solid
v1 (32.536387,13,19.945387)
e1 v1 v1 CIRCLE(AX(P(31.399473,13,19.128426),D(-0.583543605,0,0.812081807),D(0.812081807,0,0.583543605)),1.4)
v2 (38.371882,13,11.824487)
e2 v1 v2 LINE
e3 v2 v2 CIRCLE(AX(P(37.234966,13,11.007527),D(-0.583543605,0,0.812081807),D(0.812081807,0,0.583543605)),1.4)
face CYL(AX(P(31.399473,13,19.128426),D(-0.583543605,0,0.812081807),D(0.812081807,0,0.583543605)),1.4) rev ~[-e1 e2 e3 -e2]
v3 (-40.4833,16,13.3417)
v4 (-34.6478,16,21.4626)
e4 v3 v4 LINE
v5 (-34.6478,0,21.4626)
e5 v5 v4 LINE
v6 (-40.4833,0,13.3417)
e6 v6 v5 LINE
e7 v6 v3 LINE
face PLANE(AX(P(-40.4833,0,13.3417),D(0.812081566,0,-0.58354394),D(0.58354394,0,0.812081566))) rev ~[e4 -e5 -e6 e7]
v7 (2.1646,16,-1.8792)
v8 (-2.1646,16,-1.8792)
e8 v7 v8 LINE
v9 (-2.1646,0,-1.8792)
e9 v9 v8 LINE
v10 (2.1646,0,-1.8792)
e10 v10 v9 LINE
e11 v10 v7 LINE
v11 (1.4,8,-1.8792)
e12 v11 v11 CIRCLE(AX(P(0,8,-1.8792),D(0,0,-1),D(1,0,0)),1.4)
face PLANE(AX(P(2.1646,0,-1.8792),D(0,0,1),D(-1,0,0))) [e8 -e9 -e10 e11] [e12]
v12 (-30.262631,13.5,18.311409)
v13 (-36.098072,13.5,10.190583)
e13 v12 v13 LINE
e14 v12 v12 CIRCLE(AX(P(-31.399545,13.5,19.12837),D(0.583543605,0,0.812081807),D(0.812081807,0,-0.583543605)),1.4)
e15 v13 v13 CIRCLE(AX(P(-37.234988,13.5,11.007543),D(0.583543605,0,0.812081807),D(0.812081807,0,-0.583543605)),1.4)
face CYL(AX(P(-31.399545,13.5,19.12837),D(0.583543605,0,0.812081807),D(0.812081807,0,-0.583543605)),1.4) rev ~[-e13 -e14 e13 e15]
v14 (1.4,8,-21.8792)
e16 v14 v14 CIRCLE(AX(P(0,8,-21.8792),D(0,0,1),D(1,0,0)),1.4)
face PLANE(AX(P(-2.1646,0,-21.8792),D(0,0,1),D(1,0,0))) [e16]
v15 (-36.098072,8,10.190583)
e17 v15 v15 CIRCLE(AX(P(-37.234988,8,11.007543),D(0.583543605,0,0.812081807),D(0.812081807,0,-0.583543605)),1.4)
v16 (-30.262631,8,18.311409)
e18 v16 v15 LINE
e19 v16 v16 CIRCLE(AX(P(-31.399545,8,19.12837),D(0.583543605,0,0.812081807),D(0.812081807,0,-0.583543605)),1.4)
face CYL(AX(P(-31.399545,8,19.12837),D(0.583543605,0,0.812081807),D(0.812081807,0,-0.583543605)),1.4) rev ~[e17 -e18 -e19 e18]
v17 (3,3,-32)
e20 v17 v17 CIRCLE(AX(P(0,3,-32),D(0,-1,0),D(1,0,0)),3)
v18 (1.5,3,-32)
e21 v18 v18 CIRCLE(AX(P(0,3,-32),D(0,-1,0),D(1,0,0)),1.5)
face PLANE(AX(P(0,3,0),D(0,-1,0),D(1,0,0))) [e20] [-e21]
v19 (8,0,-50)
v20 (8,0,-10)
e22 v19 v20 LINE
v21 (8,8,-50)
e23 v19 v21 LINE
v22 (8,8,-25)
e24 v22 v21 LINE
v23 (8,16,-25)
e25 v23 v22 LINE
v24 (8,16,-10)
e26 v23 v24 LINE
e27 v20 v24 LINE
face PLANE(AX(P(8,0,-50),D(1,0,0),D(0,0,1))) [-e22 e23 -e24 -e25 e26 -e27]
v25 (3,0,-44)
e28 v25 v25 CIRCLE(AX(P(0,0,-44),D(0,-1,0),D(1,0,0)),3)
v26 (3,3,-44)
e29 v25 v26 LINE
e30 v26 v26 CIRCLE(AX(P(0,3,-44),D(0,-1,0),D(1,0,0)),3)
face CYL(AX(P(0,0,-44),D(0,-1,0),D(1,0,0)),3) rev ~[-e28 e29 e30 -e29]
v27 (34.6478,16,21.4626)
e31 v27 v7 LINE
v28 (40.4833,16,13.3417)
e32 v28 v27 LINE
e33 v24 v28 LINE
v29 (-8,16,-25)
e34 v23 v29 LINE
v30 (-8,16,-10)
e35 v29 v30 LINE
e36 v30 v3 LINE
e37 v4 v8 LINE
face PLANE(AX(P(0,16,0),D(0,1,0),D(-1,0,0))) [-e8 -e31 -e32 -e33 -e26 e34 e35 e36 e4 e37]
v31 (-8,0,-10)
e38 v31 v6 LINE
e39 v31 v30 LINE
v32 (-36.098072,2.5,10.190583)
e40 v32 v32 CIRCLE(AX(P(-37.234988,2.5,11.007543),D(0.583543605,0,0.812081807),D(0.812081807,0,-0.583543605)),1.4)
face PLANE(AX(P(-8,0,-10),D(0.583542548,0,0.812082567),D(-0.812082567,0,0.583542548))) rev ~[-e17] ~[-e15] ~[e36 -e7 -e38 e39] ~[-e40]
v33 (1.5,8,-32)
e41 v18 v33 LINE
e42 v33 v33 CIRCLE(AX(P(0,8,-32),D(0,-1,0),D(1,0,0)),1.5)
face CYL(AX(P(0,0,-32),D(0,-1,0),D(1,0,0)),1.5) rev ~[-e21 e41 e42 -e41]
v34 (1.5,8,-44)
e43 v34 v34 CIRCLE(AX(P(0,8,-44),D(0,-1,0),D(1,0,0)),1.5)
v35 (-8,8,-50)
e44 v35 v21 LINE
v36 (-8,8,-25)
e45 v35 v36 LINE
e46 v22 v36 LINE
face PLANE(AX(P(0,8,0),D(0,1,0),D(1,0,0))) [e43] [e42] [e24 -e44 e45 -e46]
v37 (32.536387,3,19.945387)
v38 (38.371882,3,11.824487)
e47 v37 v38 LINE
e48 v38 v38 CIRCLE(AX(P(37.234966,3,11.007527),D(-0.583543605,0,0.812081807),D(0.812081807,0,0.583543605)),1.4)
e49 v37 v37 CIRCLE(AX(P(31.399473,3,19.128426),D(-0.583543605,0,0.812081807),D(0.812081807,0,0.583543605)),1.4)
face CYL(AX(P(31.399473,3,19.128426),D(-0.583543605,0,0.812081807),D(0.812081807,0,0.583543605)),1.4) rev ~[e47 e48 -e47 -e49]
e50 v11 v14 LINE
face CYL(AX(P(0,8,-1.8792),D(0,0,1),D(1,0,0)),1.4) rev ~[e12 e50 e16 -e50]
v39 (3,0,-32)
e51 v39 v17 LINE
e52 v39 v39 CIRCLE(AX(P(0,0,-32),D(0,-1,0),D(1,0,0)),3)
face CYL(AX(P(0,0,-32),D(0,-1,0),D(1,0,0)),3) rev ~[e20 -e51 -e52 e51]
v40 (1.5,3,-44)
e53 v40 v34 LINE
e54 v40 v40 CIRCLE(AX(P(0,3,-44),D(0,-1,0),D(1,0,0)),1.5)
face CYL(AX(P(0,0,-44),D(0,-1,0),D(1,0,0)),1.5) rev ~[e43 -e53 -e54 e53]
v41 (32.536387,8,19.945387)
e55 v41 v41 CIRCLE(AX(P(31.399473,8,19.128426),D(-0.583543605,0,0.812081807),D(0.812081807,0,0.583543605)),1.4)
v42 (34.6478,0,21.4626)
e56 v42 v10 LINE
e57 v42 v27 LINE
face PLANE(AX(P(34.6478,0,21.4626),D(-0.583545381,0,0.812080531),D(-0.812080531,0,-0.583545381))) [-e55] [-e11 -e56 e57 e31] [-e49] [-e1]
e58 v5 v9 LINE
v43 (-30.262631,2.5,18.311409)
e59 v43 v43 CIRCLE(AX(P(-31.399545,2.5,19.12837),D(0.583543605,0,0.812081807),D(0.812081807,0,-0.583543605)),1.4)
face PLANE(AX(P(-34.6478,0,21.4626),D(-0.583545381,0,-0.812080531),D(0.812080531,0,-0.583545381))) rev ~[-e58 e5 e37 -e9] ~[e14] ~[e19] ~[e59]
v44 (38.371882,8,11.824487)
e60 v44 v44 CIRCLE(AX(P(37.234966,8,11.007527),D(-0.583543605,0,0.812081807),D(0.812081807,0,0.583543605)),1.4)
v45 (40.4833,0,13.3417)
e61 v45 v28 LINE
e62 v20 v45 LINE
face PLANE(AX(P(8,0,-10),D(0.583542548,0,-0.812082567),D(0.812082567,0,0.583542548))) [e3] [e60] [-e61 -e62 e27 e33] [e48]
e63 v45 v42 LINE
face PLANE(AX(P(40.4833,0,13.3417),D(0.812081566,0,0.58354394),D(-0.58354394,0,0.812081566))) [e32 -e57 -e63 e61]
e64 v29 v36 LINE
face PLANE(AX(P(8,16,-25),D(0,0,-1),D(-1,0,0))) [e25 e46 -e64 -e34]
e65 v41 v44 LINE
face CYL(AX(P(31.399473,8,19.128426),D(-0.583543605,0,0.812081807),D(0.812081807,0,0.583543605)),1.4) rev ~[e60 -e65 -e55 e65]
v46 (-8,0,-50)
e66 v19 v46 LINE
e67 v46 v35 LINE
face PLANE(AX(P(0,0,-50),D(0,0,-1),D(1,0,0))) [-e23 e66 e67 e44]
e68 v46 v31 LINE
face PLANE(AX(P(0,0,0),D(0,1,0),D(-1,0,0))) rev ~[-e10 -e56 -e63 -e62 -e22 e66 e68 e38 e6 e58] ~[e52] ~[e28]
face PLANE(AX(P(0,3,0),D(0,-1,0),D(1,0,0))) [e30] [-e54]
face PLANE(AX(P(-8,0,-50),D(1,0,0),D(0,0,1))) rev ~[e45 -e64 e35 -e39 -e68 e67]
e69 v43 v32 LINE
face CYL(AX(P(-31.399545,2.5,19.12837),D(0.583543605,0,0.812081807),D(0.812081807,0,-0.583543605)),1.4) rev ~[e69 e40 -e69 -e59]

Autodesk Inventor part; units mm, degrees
ref_plane "YZ Plane" through (0, 0, 0) normal (1, 0, 0) x (0, 1, 0)
ref_plane "XZ Plane" through (0, 0, 0) normal (0, 1, 0) x (-1, 0, 0)
ref_plane "XY Plane" through (0, 0, 0) normal (0, 0, 1) x (1, 0, 0)
sketch "Sketch1" plane through (0, 0, 0) normal (0, 1, 0) x (-1, 0, 0)
  line L0 (0, -50) -> (8, -50)
  line L1 (8, -50) -> (8, -10)
  line L2 (0, 0) -> (0, -50) construction
  line L3 (0, -50) -> (-8, -50)
  line L4 (-8, -50) -> (-8, -10)
  line L5 (8, -10) -> (40.4833, 13.3417)
  line L6 (40.4833, 13.3417) -> (34.6478, 21.4626)
  line L7 (34.6478, 21.4626) -> (2.1646, -1.8792)
  line L8 (2.1646, -1.8792) -> (0, -1.8792)
  line L9 (-8, -10) -> (-40.4833, 13.3417)
  line L10 (-40.4833, 13.3417) -> (-34.6478, 21.4626)
  line L11 (-34.6478, 21.4626) -> (-2.1646, -1.8792)
  line L12 (-2.1646, -1.8792) -> (0, -1.8792)
  point P0 (4, -50)
  dimension "d0" = 16
  dimension "d17" = 10
  dimension "d18" = 40
extrude "Extrusion1" add sketch "Sketch1" along normal blind 16
sketch "Sketch2" plane through (0, 16, 0) normal (0, 1, 0) x (1, 0, 0)
  line L0 (8, 50) -> (-8, 50) projected
  line L1 (-8, 50) -> (-8, 10) projected
  line L2 (8, 10) -> (8, 50) projected
  line L3 (8, 10) -> (8, 50) projected
  line L4 (-8, 50) -> (8, 50)
  line L5 (8, 50) -> (8, 25)
  line L6 (8, 25) -> (-8, 25)
  line L7 (-8, 25) -> (-8, 50)
  line L8 (-8, 10) -> (-40.4833, -13.3417) projected
  line L9 (-40.4833, -13.3417) -> (-34.6478, -21.4626) projected
  line L10 (-34.6478, -21.4626) -> (-2.1646, 1.8792) projected
  line L11 (-2.1646, 1.8792) -> (2.1646, 1.8792) projected
  line L12 (2.1646, 1.8792) -> (34.6478, -21.4626) projected
  line L13 (34.6478, -21.4626) -> (40.4833, -13.3417) projected
  line L14 (40.4833, -13.3417) -> (8, 10) projected
  point P0 (0, 0)
  dimension "d6" = 25
extrude "Extrusion2" cut sketch "Sketch2" against normal blind 8 contours L2 L6 L1 L0
sketch "Sketch3" plane through (0, 0, 0) normal (0, -1, 0) x (1, 0, 0)
  line L0 (8, -50) -> (-8, -50) projected
  line L1 (8, -10) -> (8, -50) projected
  line L2 (-8, -50) -> (-8, -10) projected
  circle A0 centre (0, -44) radius 1.5
  circle A1 centre (0, -32) radius 1.5
  line L3 (40.4833, 13.3417) -> (8, -10) projected
  line L4 (34.6478, 21.4626) -> (40.4833, 13.3417) projected
  line L5 (2.1646, -1.8792) -> (34.6478, 21.4626) projected
  line L6 (-2.1646, -1.8792) -> (2.1646, -1.8792) projected
  line L7 (-34.6478, 21.4626) -> (-2.1646, -1.8792) projected
  line L8 (-40.4833, 13.3417) -> (-34.6478, 21.4626) projected
  line L9 (-8, -10) -> (-40.4833, 13.3417) projected
  point P0 (0, 0)
  dimension "d9" = 3
  dimension "d10" = 6
  dimension "d11" = 12
extrude "Extrusion3" cut sketch "Sketch3" against normal through all contours A0 | A1
sketch "Sketch4" plane through (0, 0, 0) normal (0, -1, 0) x (1, 0, 0)
  circle A0 centre (0, -32) radius 1.5 projected
  circle A1 centre (0, -44) radius 1.5 projected
  line L0 (8, -50) -> (-8, -50) projected
  line L1 (8, -10) -> (8, -50) projected
  line L2 (-8, -50) -> (-8, -10) projected
  circle A2 centre (0, -44) radius 3
  circle A3 centre (0, -32) radius 1.5 projected
  circle A4 centre (0, -32) radius 3
  line L3 (40.4833, 13.3417) -> (8, -10) projected
  line L4 (34.6478, 21.4626) -> (40.4833, 13.3417) projected
  line L5 (2.1646, -1.8792) -> (34.6478, 21.4626) projected
  line L6 (-2.1646, -1.8792) -> (2.1646, -1.8792) projected
  line L7 (-34.6478, 21.4626) -> (-2.1646, -1.8792) projected
  line L8 (-40.4833, 13.3417) -> (-34.6478, 21.4626) projected
  line L9 (-8, -10) -> (-40.4833, 13.3417) projected
  point P0 (0, 0)
  dimension "d14" = 6
extrude "Extrusion4" cut sketch "Sketch4" against normal blind 3 contours A2 | A4
sketch "Sketch5" plane through (-2.1646, 0, -1.8792) normal (0.5835436, 0, 0.8120818) x (0.8120818, 0, -0.5835436)
  line L0 (-40, 0) -> (0, 0) projected
  line L1 (0, 0) -> (0, 16) projected
  line L2 (-40, 16) -> (0, 16) projected
  line L3 (-40, 0) -> (-40, 16) projected
  line L4 (-40, 0) -> (-40, 16) construction
  line L5 (-40, 8) -> (0, 8) construction
  line L6 (0, 0) -> (0, 16) construction
  circle A0 centre (-36, 13.5) radius 1.4
  circle A1 centre (-36, 8) radius 1.4
  circle A2 centre (-36, 2.5) radius 1.4
  point P0 (0.6612, 0)
  dimension "d19" = 2.8
  dimension "d20" = 11
  dimension "d21" = 4
extrude "Extrusion5" cut sketch "Sketch5" against normal through all contours A0 | A1 | A2
sketch "Sketch7" plane through (-2.1646, 0, -1.8792) normal (0, 0, 1) x (1, 0, 0)
  line L0 (0, 0) -> (4.3291, 0) projected
  line L1 (4.3291, 0) -> (4.3291, 16) projected
  line L2 (0, 16) -> (4.3291, 16) projected
  line L3 (0, 0) -> (0, 16) projected
  line L4 (0, 0) -> (0, 16) construction
  line L5 (0, 8) -> (4.3291, 8) construction
  line L6 (0.6646, 8) -> (3.6646, 8) projected
  circle A0 centre (2.1646, 8) radius 1.4
  point P0 (2.1646, 0)
  dimension "d24" = 2.8
extrude "Extrusion6" cut sketch "Sketch7" against normal blind 20 contours A0 L6 | L6 A0
sketch "Sketch8" plane through (34.6478, 0, 21.4626) normal (-0.5835436, 0, 0.8120818) x (0.8120818, 0, 0.5835436)
  line L0 (-40, 0) -> (0, 0) projected
  line L1 (0, 0) -> (0, 16) projected
  line L2 (-40, 16) -> (0, 16) projected
  line L3 (-40, 0) -> (-40, 16) projected
  line L4 (0, 0) -> (0, 16) construction
  line L5 (0, 8) -> (-40, 8) construction
  line L6 (-40, 0) -> (-40, 16) construction
  circle A0 centre (-4, 8) radius 1.4
  circle A1 centre (-4, 3) radius 1.4
  circle A2 centre (-4, 13) radius 1.4
  point P0 (-40.6612, 0)
  dimension "d27" = 2.8
  dimension "d28" = 4
  dimension "d29" = 10
extrude "Extrusion7" cut sketch "Sketch8" against normal through all contours A0 | A1 | A2
properties part number "B1_head_Y"
